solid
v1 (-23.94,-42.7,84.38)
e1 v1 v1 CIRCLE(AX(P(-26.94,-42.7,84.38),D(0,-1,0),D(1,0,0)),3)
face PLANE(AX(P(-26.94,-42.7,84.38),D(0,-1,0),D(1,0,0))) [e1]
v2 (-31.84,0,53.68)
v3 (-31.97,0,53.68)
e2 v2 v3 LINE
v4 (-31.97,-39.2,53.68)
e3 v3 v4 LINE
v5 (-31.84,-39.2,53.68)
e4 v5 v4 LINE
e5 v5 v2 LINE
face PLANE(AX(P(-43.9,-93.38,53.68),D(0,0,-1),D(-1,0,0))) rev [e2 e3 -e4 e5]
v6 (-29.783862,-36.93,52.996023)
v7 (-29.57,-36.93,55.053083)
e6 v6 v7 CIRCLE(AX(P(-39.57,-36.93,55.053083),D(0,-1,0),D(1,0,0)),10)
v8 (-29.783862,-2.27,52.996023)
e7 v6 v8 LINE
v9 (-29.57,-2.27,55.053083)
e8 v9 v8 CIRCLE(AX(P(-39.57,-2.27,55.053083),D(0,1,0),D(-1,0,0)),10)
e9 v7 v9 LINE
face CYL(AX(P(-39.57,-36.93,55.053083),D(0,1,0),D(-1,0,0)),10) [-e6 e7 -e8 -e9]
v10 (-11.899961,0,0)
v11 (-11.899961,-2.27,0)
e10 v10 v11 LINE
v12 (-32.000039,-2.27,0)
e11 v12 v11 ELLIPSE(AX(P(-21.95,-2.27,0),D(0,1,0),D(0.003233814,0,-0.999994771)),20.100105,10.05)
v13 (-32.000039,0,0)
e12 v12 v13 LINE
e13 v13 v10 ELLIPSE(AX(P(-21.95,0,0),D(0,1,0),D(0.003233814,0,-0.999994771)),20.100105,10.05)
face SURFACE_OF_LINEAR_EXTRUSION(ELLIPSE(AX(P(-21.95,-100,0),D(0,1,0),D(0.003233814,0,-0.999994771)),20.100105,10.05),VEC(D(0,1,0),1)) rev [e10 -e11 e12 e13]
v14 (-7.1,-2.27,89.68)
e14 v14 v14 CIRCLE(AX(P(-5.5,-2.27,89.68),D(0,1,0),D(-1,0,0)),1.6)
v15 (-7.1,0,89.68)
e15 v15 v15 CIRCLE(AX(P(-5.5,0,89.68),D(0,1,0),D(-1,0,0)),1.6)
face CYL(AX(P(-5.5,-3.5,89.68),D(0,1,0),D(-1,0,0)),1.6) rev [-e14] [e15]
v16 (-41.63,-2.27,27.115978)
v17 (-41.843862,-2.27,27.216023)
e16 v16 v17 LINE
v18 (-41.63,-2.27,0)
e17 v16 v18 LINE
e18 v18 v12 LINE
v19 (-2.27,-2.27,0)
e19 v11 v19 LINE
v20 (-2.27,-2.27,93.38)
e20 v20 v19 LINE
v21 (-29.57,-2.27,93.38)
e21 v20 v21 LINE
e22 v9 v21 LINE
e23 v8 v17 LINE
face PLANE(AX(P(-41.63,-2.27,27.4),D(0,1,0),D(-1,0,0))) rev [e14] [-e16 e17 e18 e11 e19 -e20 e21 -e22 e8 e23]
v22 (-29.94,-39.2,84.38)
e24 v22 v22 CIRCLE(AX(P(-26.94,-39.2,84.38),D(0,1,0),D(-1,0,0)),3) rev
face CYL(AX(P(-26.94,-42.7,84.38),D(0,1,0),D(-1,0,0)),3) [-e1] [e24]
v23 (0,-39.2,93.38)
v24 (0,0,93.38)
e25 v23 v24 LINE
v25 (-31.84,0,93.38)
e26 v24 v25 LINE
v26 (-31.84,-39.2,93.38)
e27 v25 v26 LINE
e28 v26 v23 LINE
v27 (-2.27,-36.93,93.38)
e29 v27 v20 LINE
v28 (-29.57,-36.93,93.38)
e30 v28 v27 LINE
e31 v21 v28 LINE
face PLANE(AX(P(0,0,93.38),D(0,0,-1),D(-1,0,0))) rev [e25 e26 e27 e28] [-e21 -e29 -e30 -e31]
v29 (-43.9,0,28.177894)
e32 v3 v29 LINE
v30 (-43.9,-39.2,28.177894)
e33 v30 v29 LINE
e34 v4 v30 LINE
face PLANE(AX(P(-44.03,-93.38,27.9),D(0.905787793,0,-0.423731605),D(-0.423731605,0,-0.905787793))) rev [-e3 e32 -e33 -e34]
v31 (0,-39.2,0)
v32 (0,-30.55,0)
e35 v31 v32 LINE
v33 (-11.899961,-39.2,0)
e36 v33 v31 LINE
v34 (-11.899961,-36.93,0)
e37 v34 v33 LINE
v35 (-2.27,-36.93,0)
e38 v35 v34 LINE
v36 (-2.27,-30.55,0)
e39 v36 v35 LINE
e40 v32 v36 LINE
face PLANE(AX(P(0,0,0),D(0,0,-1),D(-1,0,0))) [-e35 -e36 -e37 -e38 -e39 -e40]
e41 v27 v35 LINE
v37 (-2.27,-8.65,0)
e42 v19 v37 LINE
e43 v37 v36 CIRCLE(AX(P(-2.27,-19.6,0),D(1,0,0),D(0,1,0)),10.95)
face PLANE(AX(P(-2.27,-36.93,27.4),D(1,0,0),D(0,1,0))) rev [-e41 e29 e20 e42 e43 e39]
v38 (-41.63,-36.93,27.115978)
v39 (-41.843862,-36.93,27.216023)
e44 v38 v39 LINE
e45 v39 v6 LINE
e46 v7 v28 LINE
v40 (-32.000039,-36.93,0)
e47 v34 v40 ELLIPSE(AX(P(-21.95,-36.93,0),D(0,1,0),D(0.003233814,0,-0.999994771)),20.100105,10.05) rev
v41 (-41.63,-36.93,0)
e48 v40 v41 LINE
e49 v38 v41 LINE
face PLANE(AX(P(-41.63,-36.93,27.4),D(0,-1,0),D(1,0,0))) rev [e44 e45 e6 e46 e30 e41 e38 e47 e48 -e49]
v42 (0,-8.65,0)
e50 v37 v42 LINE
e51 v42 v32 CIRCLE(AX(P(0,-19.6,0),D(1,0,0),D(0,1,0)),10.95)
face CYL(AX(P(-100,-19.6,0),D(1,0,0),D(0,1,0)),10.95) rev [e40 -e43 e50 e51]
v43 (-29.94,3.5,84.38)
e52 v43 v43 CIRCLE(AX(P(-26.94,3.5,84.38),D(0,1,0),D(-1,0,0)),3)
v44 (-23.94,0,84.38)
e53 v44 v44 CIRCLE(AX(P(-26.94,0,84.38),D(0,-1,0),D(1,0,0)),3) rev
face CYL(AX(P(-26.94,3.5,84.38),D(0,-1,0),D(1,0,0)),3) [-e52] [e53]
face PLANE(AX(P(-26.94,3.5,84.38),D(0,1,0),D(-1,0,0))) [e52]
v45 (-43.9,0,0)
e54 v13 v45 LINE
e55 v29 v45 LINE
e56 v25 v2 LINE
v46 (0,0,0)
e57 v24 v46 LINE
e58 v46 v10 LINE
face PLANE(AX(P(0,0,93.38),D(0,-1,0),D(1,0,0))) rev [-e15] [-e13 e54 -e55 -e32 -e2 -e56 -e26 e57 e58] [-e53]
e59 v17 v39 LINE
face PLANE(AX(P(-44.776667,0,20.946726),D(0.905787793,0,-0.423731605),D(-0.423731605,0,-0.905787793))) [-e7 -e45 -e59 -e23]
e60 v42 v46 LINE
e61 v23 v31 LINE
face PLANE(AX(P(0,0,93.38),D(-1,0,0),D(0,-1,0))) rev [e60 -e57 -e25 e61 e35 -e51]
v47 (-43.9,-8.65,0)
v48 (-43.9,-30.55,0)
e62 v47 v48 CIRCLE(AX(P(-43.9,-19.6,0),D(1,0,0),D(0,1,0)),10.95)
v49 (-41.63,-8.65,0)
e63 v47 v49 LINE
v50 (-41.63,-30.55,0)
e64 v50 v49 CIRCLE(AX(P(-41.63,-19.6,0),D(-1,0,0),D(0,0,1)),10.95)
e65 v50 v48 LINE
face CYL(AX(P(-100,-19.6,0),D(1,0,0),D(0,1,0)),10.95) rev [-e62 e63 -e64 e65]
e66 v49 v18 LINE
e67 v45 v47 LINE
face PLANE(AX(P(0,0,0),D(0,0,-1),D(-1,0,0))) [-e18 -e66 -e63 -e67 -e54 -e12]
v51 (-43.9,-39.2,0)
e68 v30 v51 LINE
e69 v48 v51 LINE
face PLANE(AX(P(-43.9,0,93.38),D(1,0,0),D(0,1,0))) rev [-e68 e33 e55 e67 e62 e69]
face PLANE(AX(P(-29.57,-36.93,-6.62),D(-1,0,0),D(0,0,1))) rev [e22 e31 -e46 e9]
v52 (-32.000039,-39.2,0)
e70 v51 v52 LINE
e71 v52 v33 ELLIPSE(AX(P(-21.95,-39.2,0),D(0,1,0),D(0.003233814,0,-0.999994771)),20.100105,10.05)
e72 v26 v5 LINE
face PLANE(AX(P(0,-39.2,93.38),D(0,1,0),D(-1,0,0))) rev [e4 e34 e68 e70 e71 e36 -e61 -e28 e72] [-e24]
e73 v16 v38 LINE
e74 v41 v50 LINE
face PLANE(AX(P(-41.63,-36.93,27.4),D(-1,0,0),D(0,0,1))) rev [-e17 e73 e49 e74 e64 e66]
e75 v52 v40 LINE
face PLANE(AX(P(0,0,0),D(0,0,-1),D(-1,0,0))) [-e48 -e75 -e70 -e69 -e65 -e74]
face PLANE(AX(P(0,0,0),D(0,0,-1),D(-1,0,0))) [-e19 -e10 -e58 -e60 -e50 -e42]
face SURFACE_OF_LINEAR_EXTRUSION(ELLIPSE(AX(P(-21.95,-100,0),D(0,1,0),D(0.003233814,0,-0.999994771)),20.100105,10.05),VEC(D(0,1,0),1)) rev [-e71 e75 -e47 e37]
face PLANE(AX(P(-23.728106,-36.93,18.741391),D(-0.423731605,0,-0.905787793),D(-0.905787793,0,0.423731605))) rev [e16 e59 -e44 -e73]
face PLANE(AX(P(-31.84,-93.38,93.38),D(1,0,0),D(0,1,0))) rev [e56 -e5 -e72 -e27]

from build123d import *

# Parameters (mm, degrees)
ESQUISSE1_W                 = 43.9
ESQUISSE1_H                 = 39.2
BOSS_EXTRU_1_DEPTH          = 93.38
ESQUISSE2_W                 = 12.06
ESQUISSE2_H                 = 39.7
ENL_V_MAT_EXTRU_1_DEPTH     = 93.38
ENL_V_START                 = -68.408340654
ENL_V_MAT_EXTRU_2_OUTLINE_W = 39.2
ENL_V_MAT_EXTRU_2_OUTLINE_H = 28.154614495
ENL_V_MAT_EXTRU_2_DEPTH     = 16.704392322
ESQUISSE4_W                 = 39.36
ESQUISSE4_H                 = 34.66
ENL_V_MAT_EXTRU_3_DEPTH     = 27.4
ESQUISSE5_W                 = 27.3
ESQUISSE5_H                 = 34.66
ENL_V_MAT_EXTRU_4_DEPTH     = 100
ENL_V_START_2               = -2.27
ESQUISSE6_W                 = 28.461412474
ESQUISSE6_H                 = 34.66
ENL_V_MAT_EXTRU_7_DEPTH     = 20
CONG_2_R                    = 10
ESQUISSE7_R                 = 3
BOSS_EXTRU_2_DEPTH          = 3.5
BOSS_EXTRU_3_START          = 3.5
ESQUISSE8_R                 = 3
BOSS_EXTRU_3_DEPTH          = 3.5
ESQUISSE9_R                 = 1.6
ENL_V_MAT_EXTRU_8_DEPTH     = 3.5
ESQUISSE10_RX               = 20.100105099
ESQUISSE10_RY               = 10.05
ENL_V_MAT_EXTRU_9_DEPTH     = 100
ESQUISSE12_R                = 10.95
ENL_V_MAT_EXTRU_10_DEPTH    = 100


with BuildPart() as part:
    # Esquisse1 → Boss.-Extru.1 (new body)
    with BuildSketch(Plane.XY):
        with Locations((-21.95, -19.6)):
            Rectangle(ESQUISSE1_W, ESQUISSE1_H)
    extrude(amount=BOSS_EXTRU_1_DEPTH)

    # Esquisse2 → Enlèv. mat.-Extru.1 (cut)
    with BuildSketch(Plane(origin=(0, 0, 0), x_dir=(1, 0, 0), z_dir=(0, 1, 0))):
        with Locations((-37.87, -73.53)):
            Rectangle(ESQUISSE2_W, ESQUISSE2_H)
    extrude(amount=-ENL_V_MAT_EXTRU_1_DEPTH, mode=Mode.SUBTRACT)

    # Enlèv. mat.-Extru.2: read off the stored shape, not the designer's step
    # Enlèv. mat.-Extru.2 outline → Enlèv. mat.-Extru.2 (cut)
    with BuildSketch(Plane(origin=(0, 0, 0), x_dir=(0, 1, 0), z_dir=(0.905787793342715, 0, -0.423731605419439)).offset(ENL_V_START)):
        with Locations((-19.6, 20.998682073)):
            Rectangle(ENL_V_MAT_EXTRU_2_OUTLINE_W, ENL_V_MAT_EXTRU_2_OUTLINE_H)
    extrude(amount=ENL_V_MAT_EXTRU_2_DEPTH, mode=Mode.SUBTRACT)

    # Esquisse4 → Enlèv. mat.-Extru.3 (cut)
    with BuildSketch(Plane(origin=(0, 0, 0), x_dir=(-1, 0, 0), z_dir=(0, 0, -1))):
        with Locations((21.95, -19.6)):
            Rectangle(ESQUISSE4_W, ESQUISSE4_H)
    extrude(amount=-ENL_V_MAT_EXTRU_3_DEPTH, mode=Mode.SUBTRACT)

    # Esquisse5 → Enlèv. mat.-Extru.4 (cut)
    with BuildSketch(Plane.XY.offset(93.38)):
        with Locations((-15.92, -19.6)):
            Rectangle(ESQUISSE5_W, ESQUISSE5_H)
    extrude(amount=-ENL_V_MAT_EXTRU_4_DEPTH, mode=Mode.SUBTRACT)

    # Esquisse6 → Enlèv. mat.-Extru.7 (cut)
    with BuildSketch(Plane(origin=(-46.832805267, 0, 21.908597033), x_dir=(0.42373160541943916, 0, 0.9057877933427149), z_dir=(-0.9057877933427149, 0, 0.42373160541943916)).offset(ENL_V_START_2)):
        with Locations((21.152081063, -19.6)):
            Rectangle(ESQUISSE6_W, ESQUISSE6_H)
    extrude(amount=-ENL_V_MAT_EXTRU_7_DEPTH, mode=Mode.SUBTRACT)

    # Congé2
    # the kernel refuses this fillet: 10 mm, written as the material it takes off along each edge
    with BuildSketch(Plane(origin=(-29.57, -36.93, 52.89597765), x_dir=(0, 0, 1), z_dir=(0, 1, 0))) as cong_2_piece_1:
        with BuildLine():
            CenterArc((2.157105836, -10), CONG_2_R, 90, 11.870832878)
            Line((0.10004547, -0.213861709), (0, 0))
            Line((0, 0), (2.157105836, 0))
        make_face()
    extrude(amount=34.66, mode=Mode.SUBTRACT)

    # Esquisse7 → Boss.-Extru.2 (add)
    with BuildSketch(Plane(origin=(0, -39.2, 0), x_dir=(-1, 0, 0), z_dir=(0, -1, 0))):
        with Locations((26.94, -84.38)):
            Circle(ESQUISSE7_R)
    extrude(amount=BOSS_EXTRU_2_DEPTH)

    # Esquisse8 → Boss.-Extru.3 (add)
    with BuildSketch(Plane(origin=(0, 0, 0), x_dir=(1, 0, 0), z_dir=(0, 1, 0)).offset(BOSS_EXTRU_3_START)):
        with Locations(Location((-26.94, -84.38, 0), (0, 0, 180))):
            Circle(ESQUISSE8_R)
    extrude(amount=-BOSS_EXTRU_3_DEPTH)

    # Esquisse9 → Enlèv. mat.-Extru.8 (cut)
    with BuildSketch(Plane(origin=(0, 0, 0), x_dir=(1, 0, 0), z_dir=(0, 1, 0))):
        with Locations(Location((-5.5, -89.68, 0), (0, 0, 180))):
            Circle(ESQUISSE9_R)
    extrude(amount=-ENL_V_MAT_EXTRU_8_DEPTH, mode=Mode.SUBTRACT)

    # Esquisse10 → Enlèv. mat.-Extru.9 (cut)
    with BuildSketch(Plane(origin=(0, 0, 0), x_dir=(1, 0, 0), z_dir=(0, 1, 0))):
        with Locations(Location((-21.95, 0), (0, 0, 89.814715787))):
            Ellipse(ESQUISSE10_RX, ESQUISSE10_RY)
    extrude(amount=-ENL_V_MAT_EXTRU_9_DEPTH, mode=Mode.SUBTRACT)

    # Esquisse12 → Enlèv. mat.-Extru.10 (cut)
    with BuildSketch(Plane(origin=(0, 0, 0), x_dir=(0, 0, -1), z_dir=(1, 0, 0))):
        with Locations((0, -19.6)):
            Circle(ESQUISSE12_R)
    extrude(amount=-ENL_V_MAT_EXTRU_10_DEPTH, mode=Mode.SUBTRACT)


solid = part.part
